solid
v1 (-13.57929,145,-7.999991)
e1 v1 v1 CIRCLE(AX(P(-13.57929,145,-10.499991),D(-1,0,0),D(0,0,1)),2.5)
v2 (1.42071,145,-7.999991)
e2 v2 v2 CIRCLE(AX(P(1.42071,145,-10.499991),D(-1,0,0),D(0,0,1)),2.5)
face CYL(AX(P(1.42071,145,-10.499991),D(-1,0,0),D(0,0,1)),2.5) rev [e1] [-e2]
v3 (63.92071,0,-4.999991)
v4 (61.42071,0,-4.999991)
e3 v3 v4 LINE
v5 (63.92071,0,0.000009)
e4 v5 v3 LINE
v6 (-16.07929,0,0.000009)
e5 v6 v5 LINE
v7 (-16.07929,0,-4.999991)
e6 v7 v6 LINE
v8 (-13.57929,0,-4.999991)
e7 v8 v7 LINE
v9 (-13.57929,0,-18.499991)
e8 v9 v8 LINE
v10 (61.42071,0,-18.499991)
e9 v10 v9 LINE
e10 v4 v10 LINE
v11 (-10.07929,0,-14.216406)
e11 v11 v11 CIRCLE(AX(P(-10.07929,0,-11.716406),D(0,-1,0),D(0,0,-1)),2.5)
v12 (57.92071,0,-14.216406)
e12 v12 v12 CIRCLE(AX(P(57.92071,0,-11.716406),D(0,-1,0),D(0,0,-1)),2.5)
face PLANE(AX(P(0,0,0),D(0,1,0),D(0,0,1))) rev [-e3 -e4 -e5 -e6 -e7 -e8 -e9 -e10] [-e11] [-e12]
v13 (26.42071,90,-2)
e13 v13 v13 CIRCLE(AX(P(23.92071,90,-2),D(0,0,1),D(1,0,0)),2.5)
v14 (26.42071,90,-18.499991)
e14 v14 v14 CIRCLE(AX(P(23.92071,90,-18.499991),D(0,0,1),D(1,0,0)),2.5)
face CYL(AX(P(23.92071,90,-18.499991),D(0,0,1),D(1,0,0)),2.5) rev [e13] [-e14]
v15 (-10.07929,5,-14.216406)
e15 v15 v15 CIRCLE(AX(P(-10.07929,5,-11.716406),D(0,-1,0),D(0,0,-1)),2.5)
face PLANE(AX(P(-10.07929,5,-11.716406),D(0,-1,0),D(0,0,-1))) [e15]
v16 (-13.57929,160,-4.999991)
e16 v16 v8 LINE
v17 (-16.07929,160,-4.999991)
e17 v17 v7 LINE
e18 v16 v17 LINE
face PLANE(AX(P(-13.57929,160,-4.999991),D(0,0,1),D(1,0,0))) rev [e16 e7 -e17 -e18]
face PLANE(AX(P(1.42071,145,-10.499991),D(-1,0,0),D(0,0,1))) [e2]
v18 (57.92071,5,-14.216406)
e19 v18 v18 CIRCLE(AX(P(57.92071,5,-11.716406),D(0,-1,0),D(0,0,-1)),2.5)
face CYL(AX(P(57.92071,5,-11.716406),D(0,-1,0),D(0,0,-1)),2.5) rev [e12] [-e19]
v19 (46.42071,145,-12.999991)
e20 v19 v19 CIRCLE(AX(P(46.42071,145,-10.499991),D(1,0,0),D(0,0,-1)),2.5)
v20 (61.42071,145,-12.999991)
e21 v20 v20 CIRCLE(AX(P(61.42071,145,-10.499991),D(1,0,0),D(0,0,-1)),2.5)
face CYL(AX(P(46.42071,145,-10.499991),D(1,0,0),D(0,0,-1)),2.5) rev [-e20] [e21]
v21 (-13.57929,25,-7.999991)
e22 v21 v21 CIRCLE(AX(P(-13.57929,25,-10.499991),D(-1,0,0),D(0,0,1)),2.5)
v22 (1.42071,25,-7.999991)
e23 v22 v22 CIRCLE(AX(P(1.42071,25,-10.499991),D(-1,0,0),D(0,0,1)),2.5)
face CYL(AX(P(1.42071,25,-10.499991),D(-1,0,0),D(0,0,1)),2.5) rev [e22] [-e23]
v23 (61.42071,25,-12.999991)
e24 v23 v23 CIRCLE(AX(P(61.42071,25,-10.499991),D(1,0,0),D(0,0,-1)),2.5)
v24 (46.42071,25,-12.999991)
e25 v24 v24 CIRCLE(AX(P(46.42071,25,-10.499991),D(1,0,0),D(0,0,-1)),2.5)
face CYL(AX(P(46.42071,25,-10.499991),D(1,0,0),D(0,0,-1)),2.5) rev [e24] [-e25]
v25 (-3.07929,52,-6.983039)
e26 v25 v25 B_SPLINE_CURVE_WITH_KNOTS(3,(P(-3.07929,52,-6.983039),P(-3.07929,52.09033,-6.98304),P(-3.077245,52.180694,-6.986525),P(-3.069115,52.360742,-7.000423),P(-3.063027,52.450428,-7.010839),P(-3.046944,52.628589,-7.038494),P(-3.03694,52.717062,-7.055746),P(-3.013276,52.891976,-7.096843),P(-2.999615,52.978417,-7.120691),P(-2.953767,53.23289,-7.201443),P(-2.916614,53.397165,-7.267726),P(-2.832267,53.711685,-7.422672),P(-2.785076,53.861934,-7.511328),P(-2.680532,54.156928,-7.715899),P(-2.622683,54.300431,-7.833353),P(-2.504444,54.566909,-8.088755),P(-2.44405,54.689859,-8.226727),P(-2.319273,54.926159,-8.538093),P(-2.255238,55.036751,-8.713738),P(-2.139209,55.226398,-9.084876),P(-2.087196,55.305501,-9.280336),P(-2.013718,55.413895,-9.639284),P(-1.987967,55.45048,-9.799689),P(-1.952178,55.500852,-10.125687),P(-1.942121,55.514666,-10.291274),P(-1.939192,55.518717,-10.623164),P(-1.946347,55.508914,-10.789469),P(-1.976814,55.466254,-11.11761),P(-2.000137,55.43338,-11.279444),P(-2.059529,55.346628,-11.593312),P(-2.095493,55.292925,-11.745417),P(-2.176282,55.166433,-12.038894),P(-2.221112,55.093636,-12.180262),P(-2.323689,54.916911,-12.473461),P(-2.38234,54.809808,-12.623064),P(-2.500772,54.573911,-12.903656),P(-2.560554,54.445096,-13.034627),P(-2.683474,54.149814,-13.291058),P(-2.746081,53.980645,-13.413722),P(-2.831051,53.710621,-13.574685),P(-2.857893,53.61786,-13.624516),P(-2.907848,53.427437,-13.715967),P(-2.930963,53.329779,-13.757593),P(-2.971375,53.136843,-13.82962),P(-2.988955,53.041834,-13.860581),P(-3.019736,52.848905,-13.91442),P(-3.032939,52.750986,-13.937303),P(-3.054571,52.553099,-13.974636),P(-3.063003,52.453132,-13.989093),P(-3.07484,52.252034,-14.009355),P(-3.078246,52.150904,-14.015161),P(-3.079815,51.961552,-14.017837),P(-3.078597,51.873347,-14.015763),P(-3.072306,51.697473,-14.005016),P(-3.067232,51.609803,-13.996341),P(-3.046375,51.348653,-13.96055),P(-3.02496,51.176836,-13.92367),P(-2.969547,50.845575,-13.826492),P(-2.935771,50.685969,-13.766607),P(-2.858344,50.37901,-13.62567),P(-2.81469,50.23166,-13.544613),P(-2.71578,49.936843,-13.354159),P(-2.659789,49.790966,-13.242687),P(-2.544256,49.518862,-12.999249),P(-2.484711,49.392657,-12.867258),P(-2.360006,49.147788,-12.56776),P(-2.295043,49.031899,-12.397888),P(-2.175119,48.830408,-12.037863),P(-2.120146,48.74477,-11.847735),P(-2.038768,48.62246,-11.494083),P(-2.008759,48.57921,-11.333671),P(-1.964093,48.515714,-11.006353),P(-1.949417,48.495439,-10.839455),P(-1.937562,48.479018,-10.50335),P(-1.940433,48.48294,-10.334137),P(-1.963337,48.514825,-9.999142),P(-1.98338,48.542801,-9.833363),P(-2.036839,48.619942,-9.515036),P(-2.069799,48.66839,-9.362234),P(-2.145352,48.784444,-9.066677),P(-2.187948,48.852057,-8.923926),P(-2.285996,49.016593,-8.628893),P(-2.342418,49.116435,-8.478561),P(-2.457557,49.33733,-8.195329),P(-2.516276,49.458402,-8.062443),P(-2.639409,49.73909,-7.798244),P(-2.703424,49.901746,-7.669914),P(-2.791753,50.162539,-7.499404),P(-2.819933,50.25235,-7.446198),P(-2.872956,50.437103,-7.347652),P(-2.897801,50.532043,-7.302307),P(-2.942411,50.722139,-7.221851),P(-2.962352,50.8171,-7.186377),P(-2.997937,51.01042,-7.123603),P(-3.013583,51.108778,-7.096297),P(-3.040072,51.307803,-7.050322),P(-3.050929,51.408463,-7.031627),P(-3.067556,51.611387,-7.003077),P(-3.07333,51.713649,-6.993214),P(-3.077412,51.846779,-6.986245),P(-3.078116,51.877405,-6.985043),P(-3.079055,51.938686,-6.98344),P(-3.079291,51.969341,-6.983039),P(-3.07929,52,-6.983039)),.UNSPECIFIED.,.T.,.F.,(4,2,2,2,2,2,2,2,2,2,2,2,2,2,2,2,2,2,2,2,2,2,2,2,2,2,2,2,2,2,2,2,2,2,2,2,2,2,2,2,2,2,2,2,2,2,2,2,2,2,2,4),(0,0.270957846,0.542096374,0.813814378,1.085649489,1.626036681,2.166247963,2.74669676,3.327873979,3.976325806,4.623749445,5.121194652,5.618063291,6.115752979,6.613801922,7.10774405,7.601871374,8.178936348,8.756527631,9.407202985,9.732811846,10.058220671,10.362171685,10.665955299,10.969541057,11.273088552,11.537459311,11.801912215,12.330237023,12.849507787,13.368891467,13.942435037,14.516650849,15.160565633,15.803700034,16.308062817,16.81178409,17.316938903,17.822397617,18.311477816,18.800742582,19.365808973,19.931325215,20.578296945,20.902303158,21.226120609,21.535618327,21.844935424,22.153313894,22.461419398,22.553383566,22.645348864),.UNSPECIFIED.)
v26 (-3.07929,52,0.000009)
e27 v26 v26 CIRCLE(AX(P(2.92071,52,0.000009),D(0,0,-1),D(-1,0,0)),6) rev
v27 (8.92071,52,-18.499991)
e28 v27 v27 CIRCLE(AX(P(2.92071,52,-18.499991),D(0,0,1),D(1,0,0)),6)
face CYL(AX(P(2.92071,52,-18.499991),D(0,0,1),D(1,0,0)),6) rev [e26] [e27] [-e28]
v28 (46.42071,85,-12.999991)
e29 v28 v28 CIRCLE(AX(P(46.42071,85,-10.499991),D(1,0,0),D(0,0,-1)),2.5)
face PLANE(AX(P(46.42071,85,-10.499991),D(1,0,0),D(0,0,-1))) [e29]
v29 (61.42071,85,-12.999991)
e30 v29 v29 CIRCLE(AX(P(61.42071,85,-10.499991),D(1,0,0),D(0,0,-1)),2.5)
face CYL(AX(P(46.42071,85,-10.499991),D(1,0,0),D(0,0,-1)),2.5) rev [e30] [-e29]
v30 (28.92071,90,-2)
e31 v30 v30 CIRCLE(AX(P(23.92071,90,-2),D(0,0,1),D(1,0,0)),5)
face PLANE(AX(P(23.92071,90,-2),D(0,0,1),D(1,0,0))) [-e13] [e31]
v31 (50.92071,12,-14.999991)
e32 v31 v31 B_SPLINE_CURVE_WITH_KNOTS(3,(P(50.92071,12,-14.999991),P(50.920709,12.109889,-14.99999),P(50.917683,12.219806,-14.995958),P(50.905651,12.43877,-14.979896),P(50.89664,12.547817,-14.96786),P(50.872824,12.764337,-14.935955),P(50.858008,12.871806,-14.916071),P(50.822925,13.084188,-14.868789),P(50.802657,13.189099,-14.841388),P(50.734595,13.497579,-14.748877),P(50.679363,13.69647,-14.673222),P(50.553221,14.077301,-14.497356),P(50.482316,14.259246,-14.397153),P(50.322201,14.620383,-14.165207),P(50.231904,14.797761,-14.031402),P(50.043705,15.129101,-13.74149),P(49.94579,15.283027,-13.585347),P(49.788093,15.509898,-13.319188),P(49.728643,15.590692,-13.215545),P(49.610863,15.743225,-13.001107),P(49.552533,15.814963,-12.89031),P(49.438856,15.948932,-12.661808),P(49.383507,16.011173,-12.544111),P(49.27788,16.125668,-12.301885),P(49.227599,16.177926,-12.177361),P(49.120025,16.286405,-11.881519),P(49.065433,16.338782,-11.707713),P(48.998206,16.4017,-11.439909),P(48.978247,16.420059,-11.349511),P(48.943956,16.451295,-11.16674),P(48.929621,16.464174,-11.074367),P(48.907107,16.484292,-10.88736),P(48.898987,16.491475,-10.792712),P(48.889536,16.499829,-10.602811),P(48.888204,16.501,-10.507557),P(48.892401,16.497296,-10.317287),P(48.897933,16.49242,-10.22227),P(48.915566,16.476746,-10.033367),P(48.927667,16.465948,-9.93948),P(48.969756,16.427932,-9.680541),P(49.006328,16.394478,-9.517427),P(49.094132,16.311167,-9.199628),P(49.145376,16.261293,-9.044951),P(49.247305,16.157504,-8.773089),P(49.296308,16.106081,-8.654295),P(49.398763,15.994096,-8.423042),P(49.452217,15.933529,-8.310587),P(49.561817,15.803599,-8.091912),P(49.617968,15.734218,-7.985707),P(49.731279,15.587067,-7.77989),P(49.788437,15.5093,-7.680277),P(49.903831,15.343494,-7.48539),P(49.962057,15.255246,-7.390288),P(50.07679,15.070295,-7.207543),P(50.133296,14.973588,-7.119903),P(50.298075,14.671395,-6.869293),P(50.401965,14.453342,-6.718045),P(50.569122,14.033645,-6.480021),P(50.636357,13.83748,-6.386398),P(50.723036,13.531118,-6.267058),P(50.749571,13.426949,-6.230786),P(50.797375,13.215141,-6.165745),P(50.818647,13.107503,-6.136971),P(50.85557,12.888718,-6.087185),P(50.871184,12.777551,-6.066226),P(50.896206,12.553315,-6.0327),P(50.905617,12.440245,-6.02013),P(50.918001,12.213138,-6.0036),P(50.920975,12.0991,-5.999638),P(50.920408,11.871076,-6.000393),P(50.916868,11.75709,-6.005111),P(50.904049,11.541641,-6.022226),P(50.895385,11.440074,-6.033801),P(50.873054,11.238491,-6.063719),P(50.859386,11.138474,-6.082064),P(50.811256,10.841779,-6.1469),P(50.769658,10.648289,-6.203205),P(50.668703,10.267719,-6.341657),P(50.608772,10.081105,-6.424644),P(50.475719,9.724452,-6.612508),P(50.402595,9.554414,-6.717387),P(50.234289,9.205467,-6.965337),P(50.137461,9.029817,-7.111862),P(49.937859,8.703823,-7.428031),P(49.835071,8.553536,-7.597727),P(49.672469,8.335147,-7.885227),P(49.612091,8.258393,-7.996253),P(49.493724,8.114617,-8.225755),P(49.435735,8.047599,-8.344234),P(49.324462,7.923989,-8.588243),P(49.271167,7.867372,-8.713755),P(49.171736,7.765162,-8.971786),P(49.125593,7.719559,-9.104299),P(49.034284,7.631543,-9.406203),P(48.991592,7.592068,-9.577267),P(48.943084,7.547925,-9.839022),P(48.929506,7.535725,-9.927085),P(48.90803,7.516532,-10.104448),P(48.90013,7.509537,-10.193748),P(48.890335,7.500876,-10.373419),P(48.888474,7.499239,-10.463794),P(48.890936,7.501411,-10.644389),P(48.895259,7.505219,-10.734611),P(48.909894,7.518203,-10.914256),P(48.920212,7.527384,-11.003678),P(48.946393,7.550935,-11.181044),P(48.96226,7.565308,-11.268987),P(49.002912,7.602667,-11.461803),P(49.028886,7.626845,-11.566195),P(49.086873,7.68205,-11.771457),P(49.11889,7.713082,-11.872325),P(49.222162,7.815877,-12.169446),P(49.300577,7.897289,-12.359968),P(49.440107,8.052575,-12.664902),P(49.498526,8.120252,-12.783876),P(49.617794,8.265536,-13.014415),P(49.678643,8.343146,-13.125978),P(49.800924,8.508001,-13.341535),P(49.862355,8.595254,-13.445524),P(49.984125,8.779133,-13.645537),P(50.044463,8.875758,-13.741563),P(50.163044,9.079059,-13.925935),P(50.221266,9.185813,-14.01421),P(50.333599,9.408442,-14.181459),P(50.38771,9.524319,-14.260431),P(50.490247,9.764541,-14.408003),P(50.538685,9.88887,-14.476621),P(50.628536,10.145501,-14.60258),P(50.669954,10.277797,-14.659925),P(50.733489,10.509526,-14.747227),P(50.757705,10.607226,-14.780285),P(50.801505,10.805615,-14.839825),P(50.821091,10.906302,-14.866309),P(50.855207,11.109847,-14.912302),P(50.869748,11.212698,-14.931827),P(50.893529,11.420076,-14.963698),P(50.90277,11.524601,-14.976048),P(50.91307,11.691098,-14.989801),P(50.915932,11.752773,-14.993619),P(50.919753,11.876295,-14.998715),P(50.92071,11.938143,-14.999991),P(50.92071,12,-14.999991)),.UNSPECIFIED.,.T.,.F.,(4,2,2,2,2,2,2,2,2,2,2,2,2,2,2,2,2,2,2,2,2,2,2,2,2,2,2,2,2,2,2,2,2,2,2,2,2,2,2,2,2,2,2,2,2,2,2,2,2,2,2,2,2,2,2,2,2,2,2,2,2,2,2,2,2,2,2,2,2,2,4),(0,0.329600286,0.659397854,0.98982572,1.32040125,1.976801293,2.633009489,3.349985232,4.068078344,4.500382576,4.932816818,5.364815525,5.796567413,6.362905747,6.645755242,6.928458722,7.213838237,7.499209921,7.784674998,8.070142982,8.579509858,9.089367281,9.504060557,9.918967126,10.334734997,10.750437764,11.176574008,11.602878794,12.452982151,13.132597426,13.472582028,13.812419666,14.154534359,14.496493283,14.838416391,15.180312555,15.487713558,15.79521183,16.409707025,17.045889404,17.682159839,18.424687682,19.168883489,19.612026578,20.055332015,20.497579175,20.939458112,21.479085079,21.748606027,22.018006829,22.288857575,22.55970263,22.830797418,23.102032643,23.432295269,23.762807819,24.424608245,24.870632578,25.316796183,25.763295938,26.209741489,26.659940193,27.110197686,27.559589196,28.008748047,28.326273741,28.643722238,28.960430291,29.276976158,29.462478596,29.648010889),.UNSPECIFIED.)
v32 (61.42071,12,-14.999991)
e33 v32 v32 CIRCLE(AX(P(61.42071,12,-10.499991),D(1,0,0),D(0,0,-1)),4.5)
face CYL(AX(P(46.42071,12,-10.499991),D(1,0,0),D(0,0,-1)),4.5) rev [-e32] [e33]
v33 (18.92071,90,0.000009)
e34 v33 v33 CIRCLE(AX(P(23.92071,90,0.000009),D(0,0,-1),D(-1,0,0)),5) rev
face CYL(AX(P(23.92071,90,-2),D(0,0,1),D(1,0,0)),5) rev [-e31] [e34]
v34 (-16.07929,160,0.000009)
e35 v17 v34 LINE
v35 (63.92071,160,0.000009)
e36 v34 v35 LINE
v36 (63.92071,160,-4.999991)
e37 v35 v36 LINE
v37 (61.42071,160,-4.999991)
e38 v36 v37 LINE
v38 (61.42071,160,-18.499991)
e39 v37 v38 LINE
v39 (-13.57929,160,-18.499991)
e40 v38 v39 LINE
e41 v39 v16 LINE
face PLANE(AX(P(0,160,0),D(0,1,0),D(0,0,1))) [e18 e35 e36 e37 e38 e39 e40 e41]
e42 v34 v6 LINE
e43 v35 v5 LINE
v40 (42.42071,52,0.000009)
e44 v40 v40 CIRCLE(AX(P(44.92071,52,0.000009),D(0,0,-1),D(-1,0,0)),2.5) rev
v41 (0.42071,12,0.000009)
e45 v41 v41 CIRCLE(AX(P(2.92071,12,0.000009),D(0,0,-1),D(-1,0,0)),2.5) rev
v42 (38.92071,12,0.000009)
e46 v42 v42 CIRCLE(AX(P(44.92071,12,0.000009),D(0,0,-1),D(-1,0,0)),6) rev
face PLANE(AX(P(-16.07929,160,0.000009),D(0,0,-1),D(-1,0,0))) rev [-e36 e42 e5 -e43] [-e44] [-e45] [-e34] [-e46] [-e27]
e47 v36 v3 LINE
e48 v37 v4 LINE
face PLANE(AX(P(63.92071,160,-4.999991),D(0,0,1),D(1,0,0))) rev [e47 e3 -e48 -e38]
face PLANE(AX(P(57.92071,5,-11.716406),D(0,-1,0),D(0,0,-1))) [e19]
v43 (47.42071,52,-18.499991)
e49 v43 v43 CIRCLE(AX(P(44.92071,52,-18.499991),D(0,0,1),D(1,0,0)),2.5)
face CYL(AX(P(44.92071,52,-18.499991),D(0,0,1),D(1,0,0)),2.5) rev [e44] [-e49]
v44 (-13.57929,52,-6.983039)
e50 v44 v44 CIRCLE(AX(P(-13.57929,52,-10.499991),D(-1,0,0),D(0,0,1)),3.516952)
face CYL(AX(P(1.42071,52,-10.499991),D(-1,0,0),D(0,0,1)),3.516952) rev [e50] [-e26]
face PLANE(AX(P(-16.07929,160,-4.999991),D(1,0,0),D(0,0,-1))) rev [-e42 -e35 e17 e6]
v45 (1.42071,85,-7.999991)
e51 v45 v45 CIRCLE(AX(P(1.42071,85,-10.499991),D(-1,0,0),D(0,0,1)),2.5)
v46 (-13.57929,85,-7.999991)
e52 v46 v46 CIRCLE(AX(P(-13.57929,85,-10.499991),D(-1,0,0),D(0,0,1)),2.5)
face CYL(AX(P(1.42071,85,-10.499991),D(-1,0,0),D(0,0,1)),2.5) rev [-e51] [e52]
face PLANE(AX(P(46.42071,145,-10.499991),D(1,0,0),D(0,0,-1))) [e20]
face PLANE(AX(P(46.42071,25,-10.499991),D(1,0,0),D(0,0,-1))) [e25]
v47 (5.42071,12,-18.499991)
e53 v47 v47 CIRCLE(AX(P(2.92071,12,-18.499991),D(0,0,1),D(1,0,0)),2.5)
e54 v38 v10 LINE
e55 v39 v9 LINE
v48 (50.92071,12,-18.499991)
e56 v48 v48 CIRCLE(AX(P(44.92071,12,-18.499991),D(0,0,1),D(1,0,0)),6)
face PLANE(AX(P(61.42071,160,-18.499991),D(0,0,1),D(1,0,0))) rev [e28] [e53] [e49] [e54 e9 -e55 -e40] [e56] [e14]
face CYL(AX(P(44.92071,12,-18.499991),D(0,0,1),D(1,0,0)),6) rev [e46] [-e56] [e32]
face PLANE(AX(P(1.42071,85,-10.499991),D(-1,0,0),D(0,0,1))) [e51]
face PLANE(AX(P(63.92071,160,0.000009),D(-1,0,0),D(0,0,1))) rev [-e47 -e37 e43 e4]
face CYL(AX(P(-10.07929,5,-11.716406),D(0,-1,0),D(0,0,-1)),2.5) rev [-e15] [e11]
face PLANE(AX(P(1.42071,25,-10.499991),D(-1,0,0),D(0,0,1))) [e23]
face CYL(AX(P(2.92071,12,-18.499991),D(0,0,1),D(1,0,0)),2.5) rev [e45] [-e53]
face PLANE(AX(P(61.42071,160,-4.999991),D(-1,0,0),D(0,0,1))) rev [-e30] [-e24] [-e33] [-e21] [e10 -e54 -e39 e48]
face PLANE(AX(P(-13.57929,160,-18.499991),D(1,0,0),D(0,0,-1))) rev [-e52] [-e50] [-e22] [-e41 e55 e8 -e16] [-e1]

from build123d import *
from OCP.BRepAlgoAPI import BRepAlgoAPI_Cut
from OCP.TopTools import TopTools_ListOfShape

# Parameters (mm, degrees)
BOSS_EXTRUDE1_DEPTH = 160
SKETCH2_R           = 5
CUT_EXTRUDE1_DEPTH  = 2
SKETCH3_R           = 2.5
CUT_EXTRUDE2_DEPTH  = 174.084103307
SKETCH4_R           = 2.5
SKETCH4_R_2         = 6
CUT_EXTRUDE3_DEPTH  = 174.286199049
SKETCH5_R           = 2.5
CUT_EXTRUDE4_DEPTH  = 5
SKETCH6_R           = 2.5
SKETCH6_R_2         = 4.5
CUT_EXTRUDE5_DEPTH  = 15
CUT_EXTRUDE6_START  = -15
SKETCH7_R           = 2.5
SKETCH7_R_2         = 3.51695151
CUT_EXTRUDE6_DEPTH  = 15


with BuildPart() as part:
    # Sketch1 → Boss-Extrude1 (new body)
    with BuildSketch(Plane(origin=(0, 0, 0), x_dir=(1, 0, 0), z_dir=(0, 1, 0))):
        Polygon((-16.079290349, -9.231e-06), (63.920709651, -9.231e-06), (63.920709651, 4.999990769), (61.420709651, 4.999990769), (61.420709651, 18.499990769), (-13.579290349, 18.499990769), (-13.579290349, 4.999990769), (-16.079290349, 4.999990769), align=None)
    extrude(amount=BOSS_EXTRUDE1_DEPTH)


with BuildPart() as cut_extrude1_tool:
    # Sketch2 → Cut-Extrude1 (new body)
    with BuildSketch(Plane.XY):
        with Locations((23.920709651, 90)):
            Circle(SKETCH2_R)
    extrude(amount=-CUT_EXTRUDE1_DEPTH)


with BuildPart() as part_1:
    add(part.part)

    # Cut-Extrude1: cut by cut_extrude1_tool, with a tolerance
    cut_extrude1_stock = TopTools_ListOfShape()
    cut_extrude1_stock.Append(part_1.part.wrapped)
    cut_extrude1_tools = TopTools_ListOfShape()
    cut_extrude1_tools.Append(cut_extrude1_tool.part.wrapped)
    cut_extrude1_cut = BRepAlgoAPI_Cut()
    cut_extrude1_cut.SetArguments(cut_extrude1_stock)
    cut_extrude1_cut.SetTools(cut_extrude1_tools)
    cut_extrude1_cut.SetFuzzyValue(0.00001)
    cut_extrude1_cut.Build()
    add(Compound.cast(cut_extrude1_cut.Shape()).solids(), mode=Mode.REPLACE)

    # Sketch3 → Cut-Extrude2 (cut, through all)
    with BuildSketch(Plane.XY.offset(-2)):
        with Locations((23.920709651, 90)):
            Circle(SKETCH3_R)
    extrude(amount=-CUT_EXTRUDE2_DEPTH, mode=Mode.SUBTRACT)


with BuildPart() as cut_extrude3_tool:
    # Sketch4 → Cut-Extrude3 (new, through all)
    with BuildSketch(Plane.XY):
        with Locations((2.920709651, 12)):
            Circle(SKETCH4_R)
        with Locations((44.920709651, 12)):
            Circle(SKETCH4_R_2)
        with Locations((2.920709651, 52)):
            Circle(SKETCH4_R_2)
        with Locations((44.920709651, 52)):
            Circle(SKETCH4_R)
    extrude(amount=-CUT_EXTRUDE3_DEPTH)


with BuildPart() as part_2:
    add(part_1.part)

    # Cut-Extrude3: cut by cut_extrude3_tool, with a tolerance
    cut_extrude3_stock = TopTools_ListOfShape()
    cut_extrude3_stock.Append(part_2.part.wrapped)
    cut_extrude3_tools = TopTools_ListOfShape()
    cut_extrude3_tools.Append(cut_extrude3_tool.part.wrapped)
    cut_extrude3_cut = BRepAlgoAPI_Cut()
    cut_extrude3_cut.SetArguments(cut_extrude3_stock)
    cut_extrude3_cut.SetTools(cut_extrude3_tools)
    cut_extrude3_cut.SetFuzzyValue(0.00001)
    cut_extrude3_cut.Build()
    add(Compound.cast(cut_extrude3_cut.Shape()).solids(), mode=Mode.REPLACE)

    # Sketch5 → Cut-Extrude4 (cut)
    with BuildSketch(Plane.XZ):
        with Locations((57.920709651, -11.71640591)):
            Circle(SKETCH5_R)
        with Locations((-10.079290349, -11.71640591)):
            Circle(SKETCH5_R)
    extrude(amount=-CUT_EXTRUDE4_DEPTH, mode=Mode.SUBTRACT)

    # Sketch6 → Cut-Extrude5 (cut)
    with BuildSketch(Plane(origin=(61.420709651, 0, 0), x_dir=(0, 0, -1), z_dir=(1, 0, 0))):
        with Locations((10.499990769, 145)):
            Circle(SKETCH6_R)
        with Locations((10.499990769, 85)):
            Circle(SKETCH6_R)
        with Locations((10.499990769, 25)):
            Circle(SKETCH6_R)
        with Locations((10.499990769, 12)):
            Circle(SKETCH6_R_2)
    extrude(amount=-CUT_EXTRUDE5_DEPTH, mode=Mode.SUBTRACT)

    # Sketch7 → Cut-Extrude6 (cut)
    with BuildSketch(Plane.ZY.offset(13.579290349).offset(CUT_EXTRUDE6_START)):
        with Locations((-10.499990769, 145)):
            Circle(SKETCH7_R)
        with Locations((-10.499990769, 85)):
            Circle(SKETCH7_R)
        with Locations((-10.499990769, 25)):
            Circle(SKETCH7_R)
        with Locations((-10.499990769, 52)):
            Circle(SKETCH7_R_2)
    extrude(amount=CUT_EXTRUDE6_DEPTH, mode=Mode.SUBTRACT)


solid = part_2.part
